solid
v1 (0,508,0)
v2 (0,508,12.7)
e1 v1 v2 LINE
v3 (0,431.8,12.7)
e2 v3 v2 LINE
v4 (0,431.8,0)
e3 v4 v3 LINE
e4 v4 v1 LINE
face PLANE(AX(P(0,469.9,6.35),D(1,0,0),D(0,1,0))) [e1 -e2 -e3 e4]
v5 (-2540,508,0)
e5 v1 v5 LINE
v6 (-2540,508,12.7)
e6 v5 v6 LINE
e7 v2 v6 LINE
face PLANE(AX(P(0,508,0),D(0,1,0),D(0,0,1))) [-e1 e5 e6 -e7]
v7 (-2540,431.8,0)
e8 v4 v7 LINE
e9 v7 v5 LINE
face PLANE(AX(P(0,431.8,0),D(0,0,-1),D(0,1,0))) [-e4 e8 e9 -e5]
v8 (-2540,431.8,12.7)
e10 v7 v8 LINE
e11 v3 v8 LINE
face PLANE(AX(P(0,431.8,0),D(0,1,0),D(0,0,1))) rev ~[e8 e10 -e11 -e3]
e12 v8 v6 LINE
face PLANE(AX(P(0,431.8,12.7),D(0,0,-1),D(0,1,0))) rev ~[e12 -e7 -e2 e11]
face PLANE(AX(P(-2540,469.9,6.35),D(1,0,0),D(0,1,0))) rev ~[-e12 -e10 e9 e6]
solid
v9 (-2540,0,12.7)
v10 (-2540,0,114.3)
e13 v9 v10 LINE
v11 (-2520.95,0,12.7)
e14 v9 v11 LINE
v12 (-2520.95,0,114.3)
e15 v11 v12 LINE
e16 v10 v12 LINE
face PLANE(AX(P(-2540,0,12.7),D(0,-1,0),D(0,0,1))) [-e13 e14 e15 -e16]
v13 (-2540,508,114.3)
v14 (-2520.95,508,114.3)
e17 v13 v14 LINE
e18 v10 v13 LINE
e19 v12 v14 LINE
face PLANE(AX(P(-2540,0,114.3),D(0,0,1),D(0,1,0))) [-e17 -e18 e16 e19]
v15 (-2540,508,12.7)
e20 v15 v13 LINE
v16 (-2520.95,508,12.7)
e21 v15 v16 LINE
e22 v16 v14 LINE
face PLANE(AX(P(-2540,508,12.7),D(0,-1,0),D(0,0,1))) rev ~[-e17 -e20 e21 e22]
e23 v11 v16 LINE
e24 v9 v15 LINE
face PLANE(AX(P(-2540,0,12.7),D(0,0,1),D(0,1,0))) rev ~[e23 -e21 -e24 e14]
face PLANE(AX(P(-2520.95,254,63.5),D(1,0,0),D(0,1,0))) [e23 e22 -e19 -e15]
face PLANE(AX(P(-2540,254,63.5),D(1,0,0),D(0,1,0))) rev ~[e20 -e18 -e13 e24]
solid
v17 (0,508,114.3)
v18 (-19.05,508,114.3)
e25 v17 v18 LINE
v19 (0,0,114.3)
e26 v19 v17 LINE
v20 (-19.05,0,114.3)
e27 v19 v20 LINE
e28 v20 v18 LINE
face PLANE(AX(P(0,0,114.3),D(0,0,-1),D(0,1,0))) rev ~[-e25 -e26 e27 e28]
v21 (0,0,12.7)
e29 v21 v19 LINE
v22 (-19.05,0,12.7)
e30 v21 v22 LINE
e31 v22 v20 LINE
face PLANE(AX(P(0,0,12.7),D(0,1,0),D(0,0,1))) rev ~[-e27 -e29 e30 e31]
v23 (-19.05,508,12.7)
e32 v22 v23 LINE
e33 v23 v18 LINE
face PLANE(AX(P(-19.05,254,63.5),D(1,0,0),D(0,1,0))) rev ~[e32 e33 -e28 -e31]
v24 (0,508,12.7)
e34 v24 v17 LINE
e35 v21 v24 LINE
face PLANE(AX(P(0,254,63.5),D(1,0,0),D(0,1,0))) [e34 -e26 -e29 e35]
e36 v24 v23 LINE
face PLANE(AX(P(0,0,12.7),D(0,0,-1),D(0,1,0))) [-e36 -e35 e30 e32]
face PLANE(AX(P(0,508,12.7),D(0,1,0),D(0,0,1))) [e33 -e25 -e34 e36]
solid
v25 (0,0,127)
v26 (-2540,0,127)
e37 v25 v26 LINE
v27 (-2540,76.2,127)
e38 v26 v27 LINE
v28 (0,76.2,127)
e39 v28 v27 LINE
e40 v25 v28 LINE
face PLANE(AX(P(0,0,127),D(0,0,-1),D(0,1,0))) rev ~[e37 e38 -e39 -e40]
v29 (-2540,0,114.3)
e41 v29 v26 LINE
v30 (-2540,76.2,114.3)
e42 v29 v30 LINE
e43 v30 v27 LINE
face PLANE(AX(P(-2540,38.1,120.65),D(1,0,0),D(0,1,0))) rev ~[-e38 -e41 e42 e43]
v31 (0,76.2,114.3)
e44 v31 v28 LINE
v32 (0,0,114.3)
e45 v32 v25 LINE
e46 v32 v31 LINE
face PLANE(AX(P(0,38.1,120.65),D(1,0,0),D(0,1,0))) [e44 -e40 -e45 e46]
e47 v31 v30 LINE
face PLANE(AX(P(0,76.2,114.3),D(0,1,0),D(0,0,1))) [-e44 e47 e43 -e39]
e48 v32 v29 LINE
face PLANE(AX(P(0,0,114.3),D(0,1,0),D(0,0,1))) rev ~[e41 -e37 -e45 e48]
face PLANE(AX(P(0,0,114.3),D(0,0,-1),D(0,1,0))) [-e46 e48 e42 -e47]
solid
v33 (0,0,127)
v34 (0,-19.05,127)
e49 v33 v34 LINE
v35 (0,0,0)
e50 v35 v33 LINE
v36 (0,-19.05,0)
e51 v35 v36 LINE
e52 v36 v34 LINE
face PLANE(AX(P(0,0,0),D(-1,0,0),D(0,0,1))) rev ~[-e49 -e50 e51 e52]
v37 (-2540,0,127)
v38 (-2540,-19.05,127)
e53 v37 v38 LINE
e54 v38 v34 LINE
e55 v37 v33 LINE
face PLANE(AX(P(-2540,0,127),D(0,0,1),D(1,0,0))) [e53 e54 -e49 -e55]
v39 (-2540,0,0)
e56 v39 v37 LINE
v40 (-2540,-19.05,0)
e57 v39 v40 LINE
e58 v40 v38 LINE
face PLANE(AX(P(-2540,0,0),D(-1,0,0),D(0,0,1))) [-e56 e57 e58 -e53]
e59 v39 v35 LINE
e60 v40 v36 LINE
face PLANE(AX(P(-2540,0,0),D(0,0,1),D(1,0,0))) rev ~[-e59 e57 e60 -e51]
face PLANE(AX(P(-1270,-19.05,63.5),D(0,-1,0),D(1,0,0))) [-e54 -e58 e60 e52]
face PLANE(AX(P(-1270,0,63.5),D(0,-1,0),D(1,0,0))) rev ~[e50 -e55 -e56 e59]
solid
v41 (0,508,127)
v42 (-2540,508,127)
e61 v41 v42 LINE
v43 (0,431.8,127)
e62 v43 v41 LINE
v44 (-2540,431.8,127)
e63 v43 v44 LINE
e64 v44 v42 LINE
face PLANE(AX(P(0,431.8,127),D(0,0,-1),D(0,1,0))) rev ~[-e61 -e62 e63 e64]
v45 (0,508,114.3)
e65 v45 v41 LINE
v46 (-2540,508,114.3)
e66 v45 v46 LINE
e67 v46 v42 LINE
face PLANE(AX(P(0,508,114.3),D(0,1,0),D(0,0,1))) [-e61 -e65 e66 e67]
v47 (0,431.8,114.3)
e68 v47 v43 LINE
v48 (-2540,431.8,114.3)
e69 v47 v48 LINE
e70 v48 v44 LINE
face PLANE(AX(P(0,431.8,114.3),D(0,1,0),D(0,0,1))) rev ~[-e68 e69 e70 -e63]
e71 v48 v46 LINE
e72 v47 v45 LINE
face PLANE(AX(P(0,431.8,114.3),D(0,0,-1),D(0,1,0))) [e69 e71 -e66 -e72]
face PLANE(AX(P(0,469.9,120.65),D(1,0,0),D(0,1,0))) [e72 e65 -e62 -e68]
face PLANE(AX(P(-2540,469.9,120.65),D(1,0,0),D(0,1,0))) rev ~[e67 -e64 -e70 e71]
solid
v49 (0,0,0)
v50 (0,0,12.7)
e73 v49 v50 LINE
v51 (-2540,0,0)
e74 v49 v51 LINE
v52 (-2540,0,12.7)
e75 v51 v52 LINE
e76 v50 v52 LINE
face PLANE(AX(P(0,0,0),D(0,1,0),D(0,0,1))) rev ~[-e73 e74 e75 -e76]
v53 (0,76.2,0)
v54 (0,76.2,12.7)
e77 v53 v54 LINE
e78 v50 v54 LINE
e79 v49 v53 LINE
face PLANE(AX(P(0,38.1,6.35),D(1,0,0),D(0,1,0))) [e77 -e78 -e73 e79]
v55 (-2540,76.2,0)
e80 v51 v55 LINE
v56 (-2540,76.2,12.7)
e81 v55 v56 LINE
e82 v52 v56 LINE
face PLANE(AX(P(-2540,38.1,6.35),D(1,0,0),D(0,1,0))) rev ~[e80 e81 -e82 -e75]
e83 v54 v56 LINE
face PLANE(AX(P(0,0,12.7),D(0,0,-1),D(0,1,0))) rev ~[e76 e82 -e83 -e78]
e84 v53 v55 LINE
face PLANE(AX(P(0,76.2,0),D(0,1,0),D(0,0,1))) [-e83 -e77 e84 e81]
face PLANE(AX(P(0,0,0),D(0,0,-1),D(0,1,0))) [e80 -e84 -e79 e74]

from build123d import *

# Parameters (mm, degrees)
F1_W      = 508
F1_H      = 101.6
F2_DEPTH  = 19.05
F3_W      = 76.2
F3_H      = 12.7
F5_DEPTH  = 2540
F8_W      = 508
F8_H      = 101.6
F9_DEPTH  = 19.05
F10_W     = 2539.9999999998
F10_H     = 127
F11_DEPTH = 19.05


# Not quite as in the source:
# - a variable given as a bare number and used for a length is read in inches; the dataset says mm whatever the document's units were


with BuildPart() as f2:
    # F1 (on Right) → F2 (new body)
    with BuildSketch(Plane.YZ):
        with Locations((254, 63.5)):
            Rectangle(F1_W, F1_H)
    extrude(amount=-F2_DEPTH)


with BuildPart() as f5:
    # F3 (on Right) → F5 (new body, through all)
    with BuildSketch(Plane.YZ):
        with Locations((38.1, 120.65)):
            Rectangle(F3_W, F3_H)
    extrude(amount=-F5_DEPTH)


with BuildPart() as f5b:
    # F3 (on Right) → F5, piece 2 (new body, through all)
    with BuildSketch(Plane.YZ):
        with Locations((38.1, 6.35)):
            Rectangle(F3_W, F3_H)
    extrude(amount=-F5_DEPTH)


with BuildPart() as f5c:
    # F3 (on Right) → F5, piece 3 (new body, through all)
    with BuildSketch(Plane.YZ):
        with Locations((469.9, 6.35)):
            Rectangle(F3_W, F3_H)
    extrude(amount=-F5_DEPTH)


with BuildPart() as f5d:
    # F3 (on Right) → F5, piece 4 (new body, through all)
    with BuildSketch(Plane.YZ):
        with Locations((469.9, 120.65)):
            Rectangle(F3_W, F3_H)
    extrude(amount=-F5_DEPTH)


with BuildPart() as f6_1:
    # F6: copy of F2
    add(f2.part.moved(Location((-891.54, 0, 0))))


with BuildPart() as f9:
    # F8 (on offset) → F9 (new body)
    with BuildSketch(Plane.YZ.offset(-2540)):
        with Locations((254, 63.5)):
            Rectangle(F8_W, F8_H)
    extrude(amount=F9_DEPTH)


with BuildPart() as f11:
    # F10 (on face) → F11 (new body)
    with BuildSketch(Plane.XZ):
        with Locations((-1270.0000000002, 63.5)):
            Rectangle(F10_W, F10_H)
    extrude(amount=F11_DEPTH)


solid = Compound([f2.part, f5.part, f5b.part, f5c.part, f5d.part, f9.part, f11.part])
